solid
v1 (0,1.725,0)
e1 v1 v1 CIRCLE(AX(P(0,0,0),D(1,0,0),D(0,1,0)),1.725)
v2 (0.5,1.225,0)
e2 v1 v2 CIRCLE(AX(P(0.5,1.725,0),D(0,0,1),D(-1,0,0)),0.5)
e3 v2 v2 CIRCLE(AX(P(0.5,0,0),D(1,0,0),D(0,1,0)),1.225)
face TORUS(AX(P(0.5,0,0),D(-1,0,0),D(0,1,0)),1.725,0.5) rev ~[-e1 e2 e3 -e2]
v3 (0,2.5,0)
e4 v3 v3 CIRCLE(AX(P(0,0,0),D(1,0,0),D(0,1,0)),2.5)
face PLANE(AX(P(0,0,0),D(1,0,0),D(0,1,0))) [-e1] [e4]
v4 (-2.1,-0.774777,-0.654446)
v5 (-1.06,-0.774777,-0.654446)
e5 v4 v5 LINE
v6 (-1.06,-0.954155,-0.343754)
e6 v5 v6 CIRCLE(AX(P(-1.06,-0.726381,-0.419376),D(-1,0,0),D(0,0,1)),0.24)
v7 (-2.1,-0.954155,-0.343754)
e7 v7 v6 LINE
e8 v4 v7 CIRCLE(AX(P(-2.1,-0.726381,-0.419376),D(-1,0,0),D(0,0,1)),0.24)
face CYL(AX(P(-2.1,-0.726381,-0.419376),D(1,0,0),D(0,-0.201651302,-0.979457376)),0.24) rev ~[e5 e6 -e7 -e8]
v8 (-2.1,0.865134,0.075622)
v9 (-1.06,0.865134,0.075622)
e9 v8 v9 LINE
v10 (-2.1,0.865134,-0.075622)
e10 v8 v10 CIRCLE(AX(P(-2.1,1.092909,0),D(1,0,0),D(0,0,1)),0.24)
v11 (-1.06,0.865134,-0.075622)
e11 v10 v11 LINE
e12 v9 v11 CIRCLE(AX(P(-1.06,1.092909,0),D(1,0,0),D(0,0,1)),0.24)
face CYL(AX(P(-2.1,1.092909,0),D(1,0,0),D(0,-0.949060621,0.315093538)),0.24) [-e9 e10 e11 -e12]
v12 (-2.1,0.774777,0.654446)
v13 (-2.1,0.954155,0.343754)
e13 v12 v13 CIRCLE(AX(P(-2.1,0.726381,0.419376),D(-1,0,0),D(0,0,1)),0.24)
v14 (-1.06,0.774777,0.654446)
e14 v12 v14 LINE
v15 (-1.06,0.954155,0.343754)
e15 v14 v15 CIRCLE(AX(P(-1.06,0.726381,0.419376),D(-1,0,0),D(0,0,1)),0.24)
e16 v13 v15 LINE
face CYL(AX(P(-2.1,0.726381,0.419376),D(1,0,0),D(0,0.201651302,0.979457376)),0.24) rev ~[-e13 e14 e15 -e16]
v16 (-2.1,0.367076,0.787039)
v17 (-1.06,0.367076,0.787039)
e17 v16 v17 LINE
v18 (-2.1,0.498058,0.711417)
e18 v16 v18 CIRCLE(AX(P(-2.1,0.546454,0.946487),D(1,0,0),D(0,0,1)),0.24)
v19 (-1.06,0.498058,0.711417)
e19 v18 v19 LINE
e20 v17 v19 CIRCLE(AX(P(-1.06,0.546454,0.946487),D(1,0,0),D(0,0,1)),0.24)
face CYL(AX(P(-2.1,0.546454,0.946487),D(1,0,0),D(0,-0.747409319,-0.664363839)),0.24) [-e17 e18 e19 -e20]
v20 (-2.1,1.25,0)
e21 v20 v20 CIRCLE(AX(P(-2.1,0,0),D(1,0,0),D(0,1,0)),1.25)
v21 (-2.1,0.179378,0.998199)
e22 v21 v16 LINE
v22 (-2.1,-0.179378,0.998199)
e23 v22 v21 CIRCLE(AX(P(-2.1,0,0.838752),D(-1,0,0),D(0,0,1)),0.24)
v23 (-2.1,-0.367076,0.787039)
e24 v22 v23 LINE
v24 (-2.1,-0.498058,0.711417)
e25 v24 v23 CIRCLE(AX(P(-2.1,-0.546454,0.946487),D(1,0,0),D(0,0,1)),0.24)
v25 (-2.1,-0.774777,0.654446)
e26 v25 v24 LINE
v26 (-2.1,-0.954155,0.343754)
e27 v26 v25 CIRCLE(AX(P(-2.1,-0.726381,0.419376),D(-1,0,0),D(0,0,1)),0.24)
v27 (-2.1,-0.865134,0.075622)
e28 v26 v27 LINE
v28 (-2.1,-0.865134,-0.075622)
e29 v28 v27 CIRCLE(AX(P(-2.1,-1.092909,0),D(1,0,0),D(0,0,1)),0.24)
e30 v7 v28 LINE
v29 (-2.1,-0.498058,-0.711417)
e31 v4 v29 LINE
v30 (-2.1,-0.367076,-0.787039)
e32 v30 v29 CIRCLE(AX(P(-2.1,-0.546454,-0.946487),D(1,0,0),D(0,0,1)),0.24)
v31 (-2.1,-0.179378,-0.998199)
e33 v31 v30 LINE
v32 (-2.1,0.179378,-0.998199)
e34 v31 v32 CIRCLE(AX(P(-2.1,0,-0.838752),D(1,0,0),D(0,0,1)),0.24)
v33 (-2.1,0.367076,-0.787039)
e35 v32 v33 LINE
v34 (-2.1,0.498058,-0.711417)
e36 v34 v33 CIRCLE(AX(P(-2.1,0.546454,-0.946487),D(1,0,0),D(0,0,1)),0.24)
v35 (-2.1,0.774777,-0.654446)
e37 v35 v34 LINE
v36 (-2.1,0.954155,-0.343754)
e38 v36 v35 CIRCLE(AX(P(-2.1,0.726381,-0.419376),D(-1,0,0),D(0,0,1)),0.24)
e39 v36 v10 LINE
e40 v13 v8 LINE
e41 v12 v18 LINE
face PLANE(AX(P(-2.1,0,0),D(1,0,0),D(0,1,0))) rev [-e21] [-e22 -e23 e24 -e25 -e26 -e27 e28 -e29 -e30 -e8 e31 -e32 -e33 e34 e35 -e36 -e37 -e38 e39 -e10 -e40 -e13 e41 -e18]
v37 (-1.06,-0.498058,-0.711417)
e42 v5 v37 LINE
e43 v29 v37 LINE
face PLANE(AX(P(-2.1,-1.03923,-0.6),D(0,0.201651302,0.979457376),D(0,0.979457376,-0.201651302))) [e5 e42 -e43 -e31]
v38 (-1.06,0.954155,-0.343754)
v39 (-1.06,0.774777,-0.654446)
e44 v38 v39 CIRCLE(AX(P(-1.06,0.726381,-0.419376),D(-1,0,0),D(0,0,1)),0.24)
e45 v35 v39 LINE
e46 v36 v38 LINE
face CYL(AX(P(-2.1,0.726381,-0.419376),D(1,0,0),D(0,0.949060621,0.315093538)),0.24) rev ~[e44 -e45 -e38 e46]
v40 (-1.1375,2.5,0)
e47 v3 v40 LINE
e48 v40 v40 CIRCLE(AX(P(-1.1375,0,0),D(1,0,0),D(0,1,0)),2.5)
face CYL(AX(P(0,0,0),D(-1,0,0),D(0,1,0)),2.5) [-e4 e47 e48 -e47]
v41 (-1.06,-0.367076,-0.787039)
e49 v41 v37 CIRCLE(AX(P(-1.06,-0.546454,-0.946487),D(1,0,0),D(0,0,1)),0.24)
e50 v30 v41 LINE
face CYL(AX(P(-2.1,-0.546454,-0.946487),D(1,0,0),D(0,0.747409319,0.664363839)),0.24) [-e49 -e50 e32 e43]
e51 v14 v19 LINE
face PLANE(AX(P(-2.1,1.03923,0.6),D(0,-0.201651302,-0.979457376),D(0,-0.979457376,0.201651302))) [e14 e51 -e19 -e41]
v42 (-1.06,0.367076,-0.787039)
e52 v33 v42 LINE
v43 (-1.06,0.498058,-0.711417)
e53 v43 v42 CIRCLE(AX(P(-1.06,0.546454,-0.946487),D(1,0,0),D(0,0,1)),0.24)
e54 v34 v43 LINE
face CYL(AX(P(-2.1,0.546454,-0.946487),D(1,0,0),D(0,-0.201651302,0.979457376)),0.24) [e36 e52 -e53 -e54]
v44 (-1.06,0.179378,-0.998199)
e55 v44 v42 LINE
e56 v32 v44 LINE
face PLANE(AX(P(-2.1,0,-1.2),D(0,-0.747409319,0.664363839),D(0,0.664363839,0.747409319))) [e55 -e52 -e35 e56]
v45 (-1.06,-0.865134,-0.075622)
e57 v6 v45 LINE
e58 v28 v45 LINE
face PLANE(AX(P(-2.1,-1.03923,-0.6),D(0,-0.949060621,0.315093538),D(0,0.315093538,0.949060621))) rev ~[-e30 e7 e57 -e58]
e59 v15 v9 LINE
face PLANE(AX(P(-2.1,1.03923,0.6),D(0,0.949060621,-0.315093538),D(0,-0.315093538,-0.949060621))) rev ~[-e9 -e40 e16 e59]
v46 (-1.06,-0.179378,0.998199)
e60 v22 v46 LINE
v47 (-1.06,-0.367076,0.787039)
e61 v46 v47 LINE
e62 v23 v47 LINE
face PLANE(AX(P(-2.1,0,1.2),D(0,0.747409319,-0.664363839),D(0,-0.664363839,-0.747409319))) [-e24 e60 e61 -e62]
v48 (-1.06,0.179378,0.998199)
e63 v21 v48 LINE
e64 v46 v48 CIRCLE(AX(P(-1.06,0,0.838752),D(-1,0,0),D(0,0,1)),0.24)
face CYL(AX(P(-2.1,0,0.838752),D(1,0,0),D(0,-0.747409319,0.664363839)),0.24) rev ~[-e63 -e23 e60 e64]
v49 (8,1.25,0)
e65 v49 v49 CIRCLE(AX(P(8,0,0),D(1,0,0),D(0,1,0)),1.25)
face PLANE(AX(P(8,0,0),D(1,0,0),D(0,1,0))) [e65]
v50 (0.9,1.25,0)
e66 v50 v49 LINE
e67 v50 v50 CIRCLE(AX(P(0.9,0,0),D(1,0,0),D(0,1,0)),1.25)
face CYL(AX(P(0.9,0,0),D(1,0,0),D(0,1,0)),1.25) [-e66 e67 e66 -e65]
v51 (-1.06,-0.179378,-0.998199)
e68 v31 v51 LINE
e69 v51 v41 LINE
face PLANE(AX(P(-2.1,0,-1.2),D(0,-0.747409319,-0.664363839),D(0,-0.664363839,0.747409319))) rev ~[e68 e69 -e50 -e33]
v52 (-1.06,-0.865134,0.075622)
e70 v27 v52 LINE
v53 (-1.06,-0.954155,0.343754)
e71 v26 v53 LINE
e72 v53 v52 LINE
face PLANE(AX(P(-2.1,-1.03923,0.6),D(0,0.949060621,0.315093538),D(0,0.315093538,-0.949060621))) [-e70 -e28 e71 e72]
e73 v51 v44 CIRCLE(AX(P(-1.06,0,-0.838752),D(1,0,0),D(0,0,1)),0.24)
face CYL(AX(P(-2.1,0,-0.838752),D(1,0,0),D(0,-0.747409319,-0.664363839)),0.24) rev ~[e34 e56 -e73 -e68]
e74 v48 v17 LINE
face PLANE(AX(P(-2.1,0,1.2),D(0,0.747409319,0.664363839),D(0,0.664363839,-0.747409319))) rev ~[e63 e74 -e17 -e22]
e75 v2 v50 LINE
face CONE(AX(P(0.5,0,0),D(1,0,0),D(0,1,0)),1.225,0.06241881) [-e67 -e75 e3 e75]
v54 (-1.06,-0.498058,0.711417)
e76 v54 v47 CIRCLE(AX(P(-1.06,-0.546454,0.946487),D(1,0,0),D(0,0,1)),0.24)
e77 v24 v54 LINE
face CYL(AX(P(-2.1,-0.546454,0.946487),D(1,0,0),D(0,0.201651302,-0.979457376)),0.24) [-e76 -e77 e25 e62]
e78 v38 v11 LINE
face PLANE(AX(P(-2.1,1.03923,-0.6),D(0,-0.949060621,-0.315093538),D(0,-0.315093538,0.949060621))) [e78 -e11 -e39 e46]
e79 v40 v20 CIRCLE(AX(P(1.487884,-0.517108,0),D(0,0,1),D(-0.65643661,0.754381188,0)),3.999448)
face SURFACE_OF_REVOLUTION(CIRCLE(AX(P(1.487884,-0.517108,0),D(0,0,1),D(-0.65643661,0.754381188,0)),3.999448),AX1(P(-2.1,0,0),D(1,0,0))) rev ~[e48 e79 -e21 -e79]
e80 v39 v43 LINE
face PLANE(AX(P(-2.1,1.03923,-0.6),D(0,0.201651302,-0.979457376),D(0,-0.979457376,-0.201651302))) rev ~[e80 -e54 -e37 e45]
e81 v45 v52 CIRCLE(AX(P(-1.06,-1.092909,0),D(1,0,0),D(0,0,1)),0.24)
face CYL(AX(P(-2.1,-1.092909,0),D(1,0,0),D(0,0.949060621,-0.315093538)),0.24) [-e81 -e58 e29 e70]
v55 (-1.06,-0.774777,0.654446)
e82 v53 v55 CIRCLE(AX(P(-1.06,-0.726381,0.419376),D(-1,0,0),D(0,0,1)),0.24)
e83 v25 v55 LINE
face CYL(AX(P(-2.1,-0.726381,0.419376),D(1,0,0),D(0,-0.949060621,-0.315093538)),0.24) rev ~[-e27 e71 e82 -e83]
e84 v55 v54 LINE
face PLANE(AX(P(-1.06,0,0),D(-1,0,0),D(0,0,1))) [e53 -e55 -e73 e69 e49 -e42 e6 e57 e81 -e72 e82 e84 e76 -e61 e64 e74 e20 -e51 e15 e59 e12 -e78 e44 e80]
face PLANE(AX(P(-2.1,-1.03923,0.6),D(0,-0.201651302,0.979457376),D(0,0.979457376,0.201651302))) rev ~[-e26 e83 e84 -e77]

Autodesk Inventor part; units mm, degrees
ref_plane "YZ Plane" through (0, 0, 0) normal (1, 0, 0) x (0, 1, 0)
ref_plane "XZ Plane" through (0, 0, 0) normal (0, 1, 0) x (-1, 0, 0)
ref_plane "XY Plane" through (0, 0, 0) normal (0, 0, 1) x (1, 0, 0)
sketch "Sketch4" plane through (0, 0, 0) normal (0, 0, 1) x (1, 0, 0)
  line L0 (-2.1, 0) -> (8, 0)
  line L1 (0, 0) -> (-2.1, 0)
  line L2 (0, 2.5) -> (0, 1.725)
  line L3 (0.5, 1.225) -> (0.5, 1.225)
  line L4 (0.5, 1.225) -> (0.9, 1.25)
  arc A0 (0, 1.725) -> (0.5, 1.225) centre (0.5, 1.725) ccw
  line L5 (-2.1, 0) -> (-2.1, 1.25)
  line L6 (0, 2.5) -> (-1.1375, 2.5)
  arc A1 (-1.1375, 2.5) -> (-2.1, 1.25) centre (1.4883, -0.5175) ccw
  line L7 (0.9, 1.25) -> (8, 1.25)
  line L8 (8, 1.25) -> (8, 0)
  point P0 (0, 1.225)
  dimension "d71" = 0.5
  dimension "d72" = 8
  dimension "d74" = 0.4
  dimension "d75" = 2.45
  dimension "d78" = 2.5
  dimension "d82" = 4
  dimension "d83" = 2.1
  dimension "d84" = 5
  dimension "d104" = 7.1
  dimension "d105" = 2.5
revolve "Revolution7" add sketch "Sketch4" angle 360 about axis through (-2.1, 0, 0) along (1, 0, 0)
sketch "Sketch5" plane through (-2.1, 0, 0) normal (-1, 0, 0) x (0, 0, 1)
  circle A0 centre (0, 0) radius 1.2 construction
  circle A1 centre (0, 0) radius 0.84 construction
  line L0 (0, 0) -> (-0.7275, 0.42)
  line L1 (0, 0) -> (-0.7275, -0.42)
  line L2 (-1.8008, 0) -> (1.7887, 0)
  line L3 (-1.2, 0) -> (-0.7275, -0.42)
  line L4 (-1.2, 0) -> (-0.7275, 0.42)
  dimension "d88" = 2.4
  dimension "d89" = 1.68
  dimension "d90" = 30
  dimension "d91" = 30
extrude "Extrusion1" cut sketch "Sketch5" against normal blind 1.04
pattern_circular "Circular Pattern1" count 6 over 360 about axis through (-10, 0, 0) along (1, 0, 0) of "Extrusion1"
fillet "Fillet1" radius 0.24 12 edges at (-1.58, -1.0392, -0.6) (-1.58, -0.42, -0.7275) (-1.58, -0.84, 0) (-1.58, -1.0392, 0.6) (-1.58, -0.42, 0.7275) (-1.58, 0, 1.2) (-1.58, 0.84, 0) (-1.58, 1.0392, 0.6) (-1.58, 0.42, 0.7275) (-1.58, 0.42, -0.7275) (-1.58, 0, -1.2) (-1.58, 1.0392, -0.6)
thread "Thread7" size "M2.5x0.45" class "6g" standard "ISO Metric profile" length 7.1
properties part number "Flachkopfschraube mit Innenrund ISO 14583 - M2,5 x 8 - 4.8" material "Stahl"
